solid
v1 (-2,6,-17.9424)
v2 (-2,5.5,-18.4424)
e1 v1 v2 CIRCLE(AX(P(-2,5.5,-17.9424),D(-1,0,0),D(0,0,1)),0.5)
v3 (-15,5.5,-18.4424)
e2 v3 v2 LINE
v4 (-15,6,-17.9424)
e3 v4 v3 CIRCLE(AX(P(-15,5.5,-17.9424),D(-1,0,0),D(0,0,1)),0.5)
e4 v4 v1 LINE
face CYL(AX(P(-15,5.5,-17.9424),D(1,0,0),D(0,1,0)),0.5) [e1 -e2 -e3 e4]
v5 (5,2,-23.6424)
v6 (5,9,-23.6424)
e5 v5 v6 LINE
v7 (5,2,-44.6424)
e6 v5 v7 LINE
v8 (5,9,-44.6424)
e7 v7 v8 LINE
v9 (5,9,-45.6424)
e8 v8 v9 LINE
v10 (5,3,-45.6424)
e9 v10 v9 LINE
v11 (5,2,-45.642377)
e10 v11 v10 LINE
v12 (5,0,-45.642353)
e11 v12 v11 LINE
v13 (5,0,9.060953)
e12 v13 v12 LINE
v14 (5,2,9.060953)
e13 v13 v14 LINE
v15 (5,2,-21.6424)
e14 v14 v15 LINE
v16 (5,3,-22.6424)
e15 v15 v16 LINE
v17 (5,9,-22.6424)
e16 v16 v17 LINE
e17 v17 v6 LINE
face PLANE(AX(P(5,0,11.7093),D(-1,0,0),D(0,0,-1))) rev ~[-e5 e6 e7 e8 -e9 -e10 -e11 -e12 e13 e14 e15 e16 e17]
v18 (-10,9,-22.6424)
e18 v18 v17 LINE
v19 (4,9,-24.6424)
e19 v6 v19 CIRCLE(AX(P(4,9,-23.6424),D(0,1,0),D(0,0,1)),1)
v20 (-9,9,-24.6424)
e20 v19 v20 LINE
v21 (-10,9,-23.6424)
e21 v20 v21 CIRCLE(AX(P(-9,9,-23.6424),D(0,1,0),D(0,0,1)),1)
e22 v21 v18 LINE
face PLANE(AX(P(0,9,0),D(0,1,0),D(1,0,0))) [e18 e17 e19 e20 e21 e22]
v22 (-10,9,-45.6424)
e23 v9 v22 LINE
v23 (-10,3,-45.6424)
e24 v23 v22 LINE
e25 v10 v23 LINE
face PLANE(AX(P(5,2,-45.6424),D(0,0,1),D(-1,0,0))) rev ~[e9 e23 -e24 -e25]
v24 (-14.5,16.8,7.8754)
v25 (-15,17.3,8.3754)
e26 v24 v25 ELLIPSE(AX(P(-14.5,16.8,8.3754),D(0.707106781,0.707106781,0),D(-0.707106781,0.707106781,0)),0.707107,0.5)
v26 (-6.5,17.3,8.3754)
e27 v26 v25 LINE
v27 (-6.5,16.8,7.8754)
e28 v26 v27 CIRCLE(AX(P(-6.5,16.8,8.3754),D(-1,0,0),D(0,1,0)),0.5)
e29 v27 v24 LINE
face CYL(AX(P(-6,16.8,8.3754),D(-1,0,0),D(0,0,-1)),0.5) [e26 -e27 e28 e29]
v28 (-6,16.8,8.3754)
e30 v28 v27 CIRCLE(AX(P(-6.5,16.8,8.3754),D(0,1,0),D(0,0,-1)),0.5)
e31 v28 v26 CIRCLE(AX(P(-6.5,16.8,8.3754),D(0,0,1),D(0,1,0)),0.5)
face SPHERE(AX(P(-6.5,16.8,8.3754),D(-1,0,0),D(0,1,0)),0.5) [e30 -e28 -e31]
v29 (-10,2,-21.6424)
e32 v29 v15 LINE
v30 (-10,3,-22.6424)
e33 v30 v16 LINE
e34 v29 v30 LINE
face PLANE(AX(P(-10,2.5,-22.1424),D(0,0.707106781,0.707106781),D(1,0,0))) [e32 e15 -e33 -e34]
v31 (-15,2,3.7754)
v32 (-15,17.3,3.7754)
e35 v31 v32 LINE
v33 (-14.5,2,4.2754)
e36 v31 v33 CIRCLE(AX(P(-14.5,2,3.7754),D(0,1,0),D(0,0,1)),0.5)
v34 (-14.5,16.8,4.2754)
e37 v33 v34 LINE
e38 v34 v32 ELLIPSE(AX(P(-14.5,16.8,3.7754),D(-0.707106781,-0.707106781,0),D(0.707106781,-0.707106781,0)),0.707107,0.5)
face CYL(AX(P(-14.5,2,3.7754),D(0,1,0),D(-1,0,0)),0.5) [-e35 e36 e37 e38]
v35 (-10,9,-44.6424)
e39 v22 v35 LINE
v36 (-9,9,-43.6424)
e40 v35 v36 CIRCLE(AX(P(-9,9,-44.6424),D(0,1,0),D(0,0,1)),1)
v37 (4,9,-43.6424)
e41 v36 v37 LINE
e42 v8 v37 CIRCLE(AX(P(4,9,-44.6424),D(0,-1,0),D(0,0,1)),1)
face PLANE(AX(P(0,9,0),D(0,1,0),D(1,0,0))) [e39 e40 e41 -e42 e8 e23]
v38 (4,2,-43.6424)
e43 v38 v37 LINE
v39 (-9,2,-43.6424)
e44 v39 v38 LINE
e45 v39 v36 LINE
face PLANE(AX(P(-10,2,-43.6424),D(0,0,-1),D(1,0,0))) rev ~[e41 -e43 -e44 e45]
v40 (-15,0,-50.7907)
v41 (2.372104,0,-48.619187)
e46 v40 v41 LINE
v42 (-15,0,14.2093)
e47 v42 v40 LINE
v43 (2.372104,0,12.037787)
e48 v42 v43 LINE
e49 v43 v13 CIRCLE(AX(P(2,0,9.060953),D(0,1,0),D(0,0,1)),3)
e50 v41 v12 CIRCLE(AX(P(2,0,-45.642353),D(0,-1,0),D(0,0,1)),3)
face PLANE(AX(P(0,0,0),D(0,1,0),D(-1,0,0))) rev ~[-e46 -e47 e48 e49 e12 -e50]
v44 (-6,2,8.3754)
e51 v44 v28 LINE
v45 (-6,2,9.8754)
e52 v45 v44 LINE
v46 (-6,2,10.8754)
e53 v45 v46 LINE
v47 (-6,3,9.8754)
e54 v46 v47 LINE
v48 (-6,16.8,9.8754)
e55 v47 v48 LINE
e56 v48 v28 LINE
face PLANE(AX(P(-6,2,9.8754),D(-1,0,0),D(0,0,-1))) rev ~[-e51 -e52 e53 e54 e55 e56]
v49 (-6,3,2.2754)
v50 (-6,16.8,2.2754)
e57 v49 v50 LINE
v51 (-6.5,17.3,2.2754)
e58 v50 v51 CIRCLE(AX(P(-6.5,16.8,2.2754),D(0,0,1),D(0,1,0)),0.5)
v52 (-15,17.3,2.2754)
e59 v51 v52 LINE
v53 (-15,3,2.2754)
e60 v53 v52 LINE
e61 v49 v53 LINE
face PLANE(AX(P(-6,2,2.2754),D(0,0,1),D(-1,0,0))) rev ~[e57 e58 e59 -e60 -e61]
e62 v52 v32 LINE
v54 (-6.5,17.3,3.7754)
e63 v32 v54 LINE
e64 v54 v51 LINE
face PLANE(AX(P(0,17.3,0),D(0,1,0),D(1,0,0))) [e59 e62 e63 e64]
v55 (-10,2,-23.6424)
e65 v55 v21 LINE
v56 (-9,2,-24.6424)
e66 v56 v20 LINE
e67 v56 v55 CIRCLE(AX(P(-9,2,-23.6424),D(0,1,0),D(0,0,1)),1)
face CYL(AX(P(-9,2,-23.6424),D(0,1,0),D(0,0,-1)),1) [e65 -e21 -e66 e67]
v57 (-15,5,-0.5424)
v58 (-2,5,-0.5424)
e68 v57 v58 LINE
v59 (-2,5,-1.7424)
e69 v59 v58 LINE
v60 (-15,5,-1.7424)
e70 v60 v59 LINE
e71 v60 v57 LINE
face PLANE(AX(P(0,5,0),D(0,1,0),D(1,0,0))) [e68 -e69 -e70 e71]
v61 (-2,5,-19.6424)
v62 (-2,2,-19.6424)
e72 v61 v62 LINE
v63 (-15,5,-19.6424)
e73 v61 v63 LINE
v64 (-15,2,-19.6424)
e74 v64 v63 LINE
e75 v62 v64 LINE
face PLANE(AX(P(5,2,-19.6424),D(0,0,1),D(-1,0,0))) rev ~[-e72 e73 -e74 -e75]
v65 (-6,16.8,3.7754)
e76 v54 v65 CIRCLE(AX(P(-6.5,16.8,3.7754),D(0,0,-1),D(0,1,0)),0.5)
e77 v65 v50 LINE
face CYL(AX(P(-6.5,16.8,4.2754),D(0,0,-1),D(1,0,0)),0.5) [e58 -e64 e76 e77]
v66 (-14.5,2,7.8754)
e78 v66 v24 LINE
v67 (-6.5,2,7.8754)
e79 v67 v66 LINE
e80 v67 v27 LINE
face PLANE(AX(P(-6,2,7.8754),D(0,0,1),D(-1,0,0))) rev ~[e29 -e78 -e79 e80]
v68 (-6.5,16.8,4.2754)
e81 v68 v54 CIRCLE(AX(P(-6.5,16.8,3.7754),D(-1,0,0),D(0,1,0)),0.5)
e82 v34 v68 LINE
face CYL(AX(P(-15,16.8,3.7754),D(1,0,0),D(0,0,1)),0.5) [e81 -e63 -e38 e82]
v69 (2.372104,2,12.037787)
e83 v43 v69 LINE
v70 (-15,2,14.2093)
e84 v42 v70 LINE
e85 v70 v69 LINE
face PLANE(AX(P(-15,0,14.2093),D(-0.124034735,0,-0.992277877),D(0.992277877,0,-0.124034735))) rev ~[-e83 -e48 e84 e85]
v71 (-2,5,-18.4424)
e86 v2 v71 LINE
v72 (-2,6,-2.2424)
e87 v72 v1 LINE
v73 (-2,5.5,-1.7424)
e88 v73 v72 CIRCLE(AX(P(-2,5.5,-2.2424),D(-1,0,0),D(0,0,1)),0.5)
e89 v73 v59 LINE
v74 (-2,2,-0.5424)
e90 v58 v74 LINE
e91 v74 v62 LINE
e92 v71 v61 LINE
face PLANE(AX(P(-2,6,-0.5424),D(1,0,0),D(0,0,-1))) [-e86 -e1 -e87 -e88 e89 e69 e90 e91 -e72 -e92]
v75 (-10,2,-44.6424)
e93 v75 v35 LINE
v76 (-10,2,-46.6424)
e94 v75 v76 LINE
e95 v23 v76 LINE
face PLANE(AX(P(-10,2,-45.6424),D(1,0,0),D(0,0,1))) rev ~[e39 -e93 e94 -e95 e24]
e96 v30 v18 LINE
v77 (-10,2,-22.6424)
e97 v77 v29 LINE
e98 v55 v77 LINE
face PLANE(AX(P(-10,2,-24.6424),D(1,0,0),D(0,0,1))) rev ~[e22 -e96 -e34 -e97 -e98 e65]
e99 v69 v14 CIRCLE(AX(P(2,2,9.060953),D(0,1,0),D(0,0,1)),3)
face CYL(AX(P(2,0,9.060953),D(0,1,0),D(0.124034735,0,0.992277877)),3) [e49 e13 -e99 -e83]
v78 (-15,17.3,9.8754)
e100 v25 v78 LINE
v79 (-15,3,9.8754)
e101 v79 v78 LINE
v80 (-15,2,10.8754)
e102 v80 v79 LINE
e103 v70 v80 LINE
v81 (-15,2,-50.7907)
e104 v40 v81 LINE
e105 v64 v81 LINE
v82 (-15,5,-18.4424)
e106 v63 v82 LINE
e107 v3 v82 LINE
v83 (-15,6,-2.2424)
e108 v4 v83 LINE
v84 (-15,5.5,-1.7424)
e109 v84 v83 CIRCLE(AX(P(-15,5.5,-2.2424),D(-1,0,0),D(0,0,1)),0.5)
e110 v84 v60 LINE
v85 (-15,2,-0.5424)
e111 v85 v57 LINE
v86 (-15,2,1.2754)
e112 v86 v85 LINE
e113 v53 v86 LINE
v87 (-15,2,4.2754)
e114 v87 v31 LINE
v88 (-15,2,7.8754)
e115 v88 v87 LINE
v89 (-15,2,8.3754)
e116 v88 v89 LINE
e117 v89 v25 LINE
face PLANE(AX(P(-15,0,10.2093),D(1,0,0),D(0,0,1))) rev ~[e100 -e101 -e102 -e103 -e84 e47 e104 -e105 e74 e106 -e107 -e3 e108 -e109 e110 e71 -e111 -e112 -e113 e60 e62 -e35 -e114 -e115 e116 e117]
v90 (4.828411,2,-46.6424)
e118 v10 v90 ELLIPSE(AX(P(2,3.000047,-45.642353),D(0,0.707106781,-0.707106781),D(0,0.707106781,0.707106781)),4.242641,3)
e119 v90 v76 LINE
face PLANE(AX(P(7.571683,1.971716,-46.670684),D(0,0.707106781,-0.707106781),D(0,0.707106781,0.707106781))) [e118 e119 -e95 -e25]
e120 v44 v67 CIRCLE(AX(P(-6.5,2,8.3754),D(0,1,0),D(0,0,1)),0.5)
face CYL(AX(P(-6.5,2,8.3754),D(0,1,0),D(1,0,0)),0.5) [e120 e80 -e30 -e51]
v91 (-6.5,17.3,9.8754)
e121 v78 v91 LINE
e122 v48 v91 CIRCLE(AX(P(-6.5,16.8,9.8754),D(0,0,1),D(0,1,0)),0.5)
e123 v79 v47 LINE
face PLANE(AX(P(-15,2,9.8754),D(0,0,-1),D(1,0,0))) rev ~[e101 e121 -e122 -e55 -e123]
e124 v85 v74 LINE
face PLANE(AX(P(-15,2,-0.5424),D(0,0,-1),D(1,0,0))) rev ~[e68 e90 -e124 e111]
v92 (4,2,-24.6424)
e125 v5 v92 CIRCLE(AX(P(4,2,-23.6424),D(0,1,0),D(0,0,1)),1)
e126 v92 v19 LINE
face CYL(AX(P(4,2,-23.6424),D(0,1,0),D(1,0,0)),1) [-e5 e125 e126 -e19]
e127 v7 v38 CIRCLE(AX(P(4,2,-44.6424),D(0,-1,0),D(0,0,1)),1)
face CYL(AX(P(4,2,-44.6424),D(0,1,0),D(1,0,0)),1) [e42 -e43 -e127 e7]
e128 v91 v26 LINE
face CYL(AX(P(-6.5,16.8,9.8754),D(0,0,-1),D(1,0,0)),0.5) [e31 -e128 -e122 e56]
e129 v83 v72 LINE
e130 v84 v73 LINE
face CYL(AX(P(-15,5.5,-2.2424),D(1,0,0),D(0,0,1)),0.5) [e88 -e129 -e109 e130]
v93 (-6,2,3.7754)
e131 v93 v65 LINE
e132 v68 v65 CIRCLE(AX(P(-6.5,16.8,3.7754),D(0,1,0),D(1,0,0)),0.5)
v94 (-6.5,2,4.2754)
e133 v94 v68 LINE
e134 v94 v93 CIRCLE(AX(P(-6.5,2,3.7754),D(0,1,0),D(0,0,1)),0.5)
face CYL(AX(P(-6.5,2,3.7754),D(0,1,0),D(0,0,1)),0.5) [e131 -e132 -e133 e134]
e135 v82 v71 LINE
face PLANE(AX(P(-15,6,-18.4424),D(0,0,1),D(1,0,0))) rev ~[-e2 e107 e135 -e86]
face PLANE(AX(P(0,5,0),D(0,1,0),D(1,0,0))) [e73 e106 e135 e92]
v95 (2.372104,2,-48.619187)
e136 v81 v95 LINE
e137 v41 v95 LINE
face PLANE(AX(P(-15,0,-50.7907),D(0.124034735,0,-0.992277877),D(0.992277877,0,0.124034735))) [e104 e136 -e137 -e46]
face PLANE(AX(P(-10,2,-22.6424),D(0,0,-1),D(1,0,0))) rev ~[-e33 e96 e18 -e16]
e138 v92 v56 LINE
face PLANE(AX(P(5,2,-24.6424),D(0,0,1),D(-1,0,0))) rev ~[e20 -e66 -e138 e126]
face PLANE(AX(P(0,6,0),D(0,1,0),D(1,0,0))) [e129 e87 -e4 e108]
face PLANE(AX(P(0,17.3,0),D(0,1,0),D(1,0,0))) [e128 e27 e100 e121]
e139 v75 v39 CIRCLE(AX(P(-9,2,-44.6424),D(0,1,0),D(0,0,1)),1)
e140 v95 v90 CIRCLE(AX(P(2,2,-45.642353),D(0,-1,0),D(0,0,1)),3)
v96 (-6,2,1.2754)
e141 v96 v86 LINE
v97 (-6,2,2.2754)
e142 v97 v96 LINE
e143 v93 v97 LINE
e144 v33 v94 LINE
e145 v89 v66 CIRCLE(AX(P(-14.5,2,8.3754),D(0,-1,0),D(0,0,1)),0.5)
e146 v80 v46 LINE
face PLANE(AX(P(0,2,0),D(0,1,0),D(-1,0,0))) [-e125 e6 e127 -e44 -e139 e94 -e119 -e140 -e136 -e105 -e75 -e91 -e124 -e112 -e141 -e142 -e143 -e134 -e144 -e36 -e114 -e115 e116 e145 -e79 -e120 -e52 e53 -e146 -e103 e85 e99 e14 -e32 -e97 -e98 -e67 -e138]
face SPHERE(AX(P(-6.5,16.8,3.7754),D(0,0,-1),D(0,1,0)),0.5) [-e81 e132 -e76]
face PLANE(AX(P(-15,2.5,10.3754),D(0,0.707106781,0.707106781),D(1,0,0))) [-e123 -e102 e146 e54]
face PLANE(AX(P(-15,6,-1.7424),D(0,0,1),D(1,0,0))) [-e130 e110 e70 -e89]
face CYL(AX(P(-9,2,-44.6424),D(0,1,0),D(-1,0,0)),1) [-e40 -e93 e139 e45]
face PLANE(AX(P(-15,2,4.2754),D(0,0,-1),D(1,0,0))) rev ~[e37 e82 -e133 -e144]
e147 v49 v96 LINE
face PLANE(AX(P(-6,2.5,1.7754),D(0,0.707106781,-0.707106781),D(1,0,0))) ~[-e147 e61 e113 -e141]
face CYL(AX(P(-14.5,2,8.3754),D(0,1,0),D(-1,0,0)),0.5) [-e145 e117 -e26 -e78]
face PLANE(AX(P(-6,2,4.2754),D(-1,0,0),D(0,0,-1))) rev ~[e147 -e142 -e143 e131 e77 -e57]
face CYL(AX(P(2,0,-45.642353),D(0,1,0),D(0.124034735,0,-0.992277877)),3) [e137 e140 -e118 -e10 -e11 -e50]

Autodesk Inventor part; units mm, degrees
ref_plane "YZ Plane" through (0, 0, 0) normal (1, 0, 0) x (0, 1, 0)
ref_plane "XZ Plane" through (0, 0, 0) normal (0, 1, 0) x (-1, 0, 0)
ref_plane "XY Plane" through (0, 0, 0) normal (0, 0, 1) x (1, 0, 0)
sketch "Эскиз1" plane through (0, 0, 0) normal (0, 1, 0) x (-1, 0, 0)
  line L0 (-5, 11.7093) -> (-5, -48.2907)
  line L1 (15, 10.2093) -> (15, -46.7907)
  line L2 (15, 10.2093) -> (15, 14.2093)
  line L3 (15, -46.7907) -> (15, -50.7907)
  line L4 (15, 14.2093) -> (-5, 11.7093)
  line L5 (15, -50.7907) -> (-5, -48.2907)
  point P0 (0, 0)
  dimension "d0" = 60
  dimension "d3" = 20
  dimension "d4" = 4
  dimension "d5" = 4
extrude "Выдавливание1" add sketch "Эскиз1" along normal blind 2
fillet "Сопряжение1" radius 3 2 edges at (5, 1, -48.2907) (5, 1, 11.7093)
sketch "Эскиз3" plane through (0, 2, 0) normal (0, 1, 0) x (1, 0, 0)
  arc A0 (5, 45.6424) -> (2.3721, 48.6192) centre (2, 45.6424) ccw projected
  line L0 (5, 45.6424) -> (-10, 45.6424)
  line L1 (-10, 45.6424) -> (-10, 43.6424)
  line L2 (-10, 43.6424) -> (5, 43.6424)
  line L3 (5, 43.6424) -> (5, 45.6424)
  line L4 (5, -9.0609) -> (5, 45.6424) projected
  line L5 (5, 24.6424) -> (-10, 24.6424)
  line L6 (-10, 24.6424) -> (-10, 22.6424)
  line L7 (-10, 22.6424) -> (5, 22.6424)
  line L8 (5, 22.6424) -> (5, 24.6424)
  point P0 (0, 0)
  dimension "d21" = 15
  dimension "d22" = 2
  dimension "d23" = 2
  dimension "d24" = 19
extrude "Выдавливание2" add sketch "Эскиз3" along normal blind 7
fillet "Сопряжение2" radius 1 4 edges at (5, 5.5, -43.6424) (5, 5.5, -24.6424) (-10, 5.5, -43.6424) (-10, 5.5, -24.6424)
chamfer "Фаска1" distance 1 angle 45 1 edges at (-2.5, 2, -45.6424)
sketch "Эскиз4" plane through (0, 2, 0) normal (0, 1, 0) x (1, 0, 0)
  line L0 (5, -9.0609) -> (5, 45.6424) projected
  line L1 (5, 19.6424) -> (-15, 19.6424)
  line L2 (-15, 19.6424) -> (-15, 0.5424)
  line L3 (-15, 0.5424) -> (5, 0.5424)
  line L4 (5, 0.5424) -> (5, 19.6424)
  line L5 (-9, 43.6424) -> (4, 43.6424) projected
  point P0 (0, 0)
  point P1 (5, 0.5424)
  dimension "d31" = 20
  dimension "d32" = 19.1
  dimension "d33" = 24
extrude "Выдавливание3" add sketch "Эскиз4" along normal blind 4
sketch "Эскиз5" plane through (0, 6, 0) normal (0, 1, 0) x (1, 0, 0)
  line L0 (-15, 0.5424) -> (5, 0.5424) projected
  line L1 (-15, 19.6424) -> (5, 19.6424) projected
  line L2 (5, 0.5424) -> (-2, 0.5424)
  line L3 (-2, 0.5424) -> (-2, 19.6424)
  line L4 (-2, 19.6424) -> (5, 19.6424)
  line L5 (5, 19.6424) -> (5, 0.5424)
  point P0 (0, 0)
  point P1 (5, 19.6424)
  dimension "d36" = 7
extrude "Выдавливание4" cut sketch "Эскиз5" against normal blind 4
sketch "Эскиз6" plane through (0, 6, 0) normal (0, 1, 0) x (1, 0, 0)
  line L0 (-15, 50.7907) -> (-15, -14.2093) projected
  line L1 (-15, 0.5424) -> (-2, 0.5424) projected
  line L2 (-15, 1.7424) -> (-2, 1.7424)
  line L3 (-2, 1.7424) -> (-2, 0.5424)
  line L4 (-2, 0.5424) -> (-15, 0.5424)
  line L5 (-15, 0.5424) -> (-15, 1.7424)
  line L6 (-2, 0.5424) -> (-2, 19.6424) projected
  line L7 (-2, 19.6424) -> (-15, 19.6424)
  line L8 (-15, 19.6424) -> (-15, 18.4424)
  line L9 (-15, 18.4424) -> (-2, 18.4424)
  line L10 (-2, 18.4424) -> (-2, 19.6424)
  point P0 (0, 0)
  point P1 (-2, 18.4424)
  point P2 (-15, 19.6424)
  dimension "d39" = 1.2
  dimension "d40" = 1.2
extrude "Выдавливание5" cut sketch "Эскиз6" against normal blind 1 contours L7 L6 L9 L0 | L2 L3 L1 L0
fillet "Сопряжение3" radius 0.5 2 edges at (-8.5, 6, -1.7424) (-8.5, 6, -18.4424)
sketch "Эскиз7" plane through (0, 2, 0) normal (0, 1, 0) x (1, 0, 0)
  line L0 (-15, -9.8754) -> (-6, -9.8754)
  line L1 (-6, -9.8754) -> (-6, -7.8754)
  line L2 (-6, -7.8754) -> (-15, -7.8754)
  line L3 (-15, -7.8754) -> (-15, -9.8754)
  line L4 (-15, 0.5424) -> (-15, -14.2093) projected
  line L5 (-6, -2.2754) -> (-15, -2.2754)
  line L6 (-15, -2.2754) -> (-15, -4.2754)
  line L7 (-15, -4.2754) -> (-6, -4.2754)
  line L8 (-6, -4.2754) -> (-6, -2.2754)
  point P0 (0, 0)
  dimension "d44" = 2
  dimension "d45" = 0
  dimension "d46" = 9
  dimension "d47" = 2
  dimension "d48" = 3.6
extrude "Выдавливание6" add sketch "Эскиз7" along normal blind 15.3
fillet "Сопряжение4" radius 0.5 8 edges at (-6, 17.3, 3.2754) (-10.5, 17.3, 4.2754) (-10.5, 17.3, 7.8754) (-6, 17.3, 8.8754) (-6, 9.65, 4.2754) (-6, 9.65, 7.8754) (-15, 9.65, 4.2754) (-15, 9.65, 7.8754)
chamfer "Фаска2" distance 1 angle 45 3 edges at (-10.5, 2, 9.8754) (-10.5, 2, 2.2754) (-2.5, 2, -22.6424)
properties part number "ploh"
